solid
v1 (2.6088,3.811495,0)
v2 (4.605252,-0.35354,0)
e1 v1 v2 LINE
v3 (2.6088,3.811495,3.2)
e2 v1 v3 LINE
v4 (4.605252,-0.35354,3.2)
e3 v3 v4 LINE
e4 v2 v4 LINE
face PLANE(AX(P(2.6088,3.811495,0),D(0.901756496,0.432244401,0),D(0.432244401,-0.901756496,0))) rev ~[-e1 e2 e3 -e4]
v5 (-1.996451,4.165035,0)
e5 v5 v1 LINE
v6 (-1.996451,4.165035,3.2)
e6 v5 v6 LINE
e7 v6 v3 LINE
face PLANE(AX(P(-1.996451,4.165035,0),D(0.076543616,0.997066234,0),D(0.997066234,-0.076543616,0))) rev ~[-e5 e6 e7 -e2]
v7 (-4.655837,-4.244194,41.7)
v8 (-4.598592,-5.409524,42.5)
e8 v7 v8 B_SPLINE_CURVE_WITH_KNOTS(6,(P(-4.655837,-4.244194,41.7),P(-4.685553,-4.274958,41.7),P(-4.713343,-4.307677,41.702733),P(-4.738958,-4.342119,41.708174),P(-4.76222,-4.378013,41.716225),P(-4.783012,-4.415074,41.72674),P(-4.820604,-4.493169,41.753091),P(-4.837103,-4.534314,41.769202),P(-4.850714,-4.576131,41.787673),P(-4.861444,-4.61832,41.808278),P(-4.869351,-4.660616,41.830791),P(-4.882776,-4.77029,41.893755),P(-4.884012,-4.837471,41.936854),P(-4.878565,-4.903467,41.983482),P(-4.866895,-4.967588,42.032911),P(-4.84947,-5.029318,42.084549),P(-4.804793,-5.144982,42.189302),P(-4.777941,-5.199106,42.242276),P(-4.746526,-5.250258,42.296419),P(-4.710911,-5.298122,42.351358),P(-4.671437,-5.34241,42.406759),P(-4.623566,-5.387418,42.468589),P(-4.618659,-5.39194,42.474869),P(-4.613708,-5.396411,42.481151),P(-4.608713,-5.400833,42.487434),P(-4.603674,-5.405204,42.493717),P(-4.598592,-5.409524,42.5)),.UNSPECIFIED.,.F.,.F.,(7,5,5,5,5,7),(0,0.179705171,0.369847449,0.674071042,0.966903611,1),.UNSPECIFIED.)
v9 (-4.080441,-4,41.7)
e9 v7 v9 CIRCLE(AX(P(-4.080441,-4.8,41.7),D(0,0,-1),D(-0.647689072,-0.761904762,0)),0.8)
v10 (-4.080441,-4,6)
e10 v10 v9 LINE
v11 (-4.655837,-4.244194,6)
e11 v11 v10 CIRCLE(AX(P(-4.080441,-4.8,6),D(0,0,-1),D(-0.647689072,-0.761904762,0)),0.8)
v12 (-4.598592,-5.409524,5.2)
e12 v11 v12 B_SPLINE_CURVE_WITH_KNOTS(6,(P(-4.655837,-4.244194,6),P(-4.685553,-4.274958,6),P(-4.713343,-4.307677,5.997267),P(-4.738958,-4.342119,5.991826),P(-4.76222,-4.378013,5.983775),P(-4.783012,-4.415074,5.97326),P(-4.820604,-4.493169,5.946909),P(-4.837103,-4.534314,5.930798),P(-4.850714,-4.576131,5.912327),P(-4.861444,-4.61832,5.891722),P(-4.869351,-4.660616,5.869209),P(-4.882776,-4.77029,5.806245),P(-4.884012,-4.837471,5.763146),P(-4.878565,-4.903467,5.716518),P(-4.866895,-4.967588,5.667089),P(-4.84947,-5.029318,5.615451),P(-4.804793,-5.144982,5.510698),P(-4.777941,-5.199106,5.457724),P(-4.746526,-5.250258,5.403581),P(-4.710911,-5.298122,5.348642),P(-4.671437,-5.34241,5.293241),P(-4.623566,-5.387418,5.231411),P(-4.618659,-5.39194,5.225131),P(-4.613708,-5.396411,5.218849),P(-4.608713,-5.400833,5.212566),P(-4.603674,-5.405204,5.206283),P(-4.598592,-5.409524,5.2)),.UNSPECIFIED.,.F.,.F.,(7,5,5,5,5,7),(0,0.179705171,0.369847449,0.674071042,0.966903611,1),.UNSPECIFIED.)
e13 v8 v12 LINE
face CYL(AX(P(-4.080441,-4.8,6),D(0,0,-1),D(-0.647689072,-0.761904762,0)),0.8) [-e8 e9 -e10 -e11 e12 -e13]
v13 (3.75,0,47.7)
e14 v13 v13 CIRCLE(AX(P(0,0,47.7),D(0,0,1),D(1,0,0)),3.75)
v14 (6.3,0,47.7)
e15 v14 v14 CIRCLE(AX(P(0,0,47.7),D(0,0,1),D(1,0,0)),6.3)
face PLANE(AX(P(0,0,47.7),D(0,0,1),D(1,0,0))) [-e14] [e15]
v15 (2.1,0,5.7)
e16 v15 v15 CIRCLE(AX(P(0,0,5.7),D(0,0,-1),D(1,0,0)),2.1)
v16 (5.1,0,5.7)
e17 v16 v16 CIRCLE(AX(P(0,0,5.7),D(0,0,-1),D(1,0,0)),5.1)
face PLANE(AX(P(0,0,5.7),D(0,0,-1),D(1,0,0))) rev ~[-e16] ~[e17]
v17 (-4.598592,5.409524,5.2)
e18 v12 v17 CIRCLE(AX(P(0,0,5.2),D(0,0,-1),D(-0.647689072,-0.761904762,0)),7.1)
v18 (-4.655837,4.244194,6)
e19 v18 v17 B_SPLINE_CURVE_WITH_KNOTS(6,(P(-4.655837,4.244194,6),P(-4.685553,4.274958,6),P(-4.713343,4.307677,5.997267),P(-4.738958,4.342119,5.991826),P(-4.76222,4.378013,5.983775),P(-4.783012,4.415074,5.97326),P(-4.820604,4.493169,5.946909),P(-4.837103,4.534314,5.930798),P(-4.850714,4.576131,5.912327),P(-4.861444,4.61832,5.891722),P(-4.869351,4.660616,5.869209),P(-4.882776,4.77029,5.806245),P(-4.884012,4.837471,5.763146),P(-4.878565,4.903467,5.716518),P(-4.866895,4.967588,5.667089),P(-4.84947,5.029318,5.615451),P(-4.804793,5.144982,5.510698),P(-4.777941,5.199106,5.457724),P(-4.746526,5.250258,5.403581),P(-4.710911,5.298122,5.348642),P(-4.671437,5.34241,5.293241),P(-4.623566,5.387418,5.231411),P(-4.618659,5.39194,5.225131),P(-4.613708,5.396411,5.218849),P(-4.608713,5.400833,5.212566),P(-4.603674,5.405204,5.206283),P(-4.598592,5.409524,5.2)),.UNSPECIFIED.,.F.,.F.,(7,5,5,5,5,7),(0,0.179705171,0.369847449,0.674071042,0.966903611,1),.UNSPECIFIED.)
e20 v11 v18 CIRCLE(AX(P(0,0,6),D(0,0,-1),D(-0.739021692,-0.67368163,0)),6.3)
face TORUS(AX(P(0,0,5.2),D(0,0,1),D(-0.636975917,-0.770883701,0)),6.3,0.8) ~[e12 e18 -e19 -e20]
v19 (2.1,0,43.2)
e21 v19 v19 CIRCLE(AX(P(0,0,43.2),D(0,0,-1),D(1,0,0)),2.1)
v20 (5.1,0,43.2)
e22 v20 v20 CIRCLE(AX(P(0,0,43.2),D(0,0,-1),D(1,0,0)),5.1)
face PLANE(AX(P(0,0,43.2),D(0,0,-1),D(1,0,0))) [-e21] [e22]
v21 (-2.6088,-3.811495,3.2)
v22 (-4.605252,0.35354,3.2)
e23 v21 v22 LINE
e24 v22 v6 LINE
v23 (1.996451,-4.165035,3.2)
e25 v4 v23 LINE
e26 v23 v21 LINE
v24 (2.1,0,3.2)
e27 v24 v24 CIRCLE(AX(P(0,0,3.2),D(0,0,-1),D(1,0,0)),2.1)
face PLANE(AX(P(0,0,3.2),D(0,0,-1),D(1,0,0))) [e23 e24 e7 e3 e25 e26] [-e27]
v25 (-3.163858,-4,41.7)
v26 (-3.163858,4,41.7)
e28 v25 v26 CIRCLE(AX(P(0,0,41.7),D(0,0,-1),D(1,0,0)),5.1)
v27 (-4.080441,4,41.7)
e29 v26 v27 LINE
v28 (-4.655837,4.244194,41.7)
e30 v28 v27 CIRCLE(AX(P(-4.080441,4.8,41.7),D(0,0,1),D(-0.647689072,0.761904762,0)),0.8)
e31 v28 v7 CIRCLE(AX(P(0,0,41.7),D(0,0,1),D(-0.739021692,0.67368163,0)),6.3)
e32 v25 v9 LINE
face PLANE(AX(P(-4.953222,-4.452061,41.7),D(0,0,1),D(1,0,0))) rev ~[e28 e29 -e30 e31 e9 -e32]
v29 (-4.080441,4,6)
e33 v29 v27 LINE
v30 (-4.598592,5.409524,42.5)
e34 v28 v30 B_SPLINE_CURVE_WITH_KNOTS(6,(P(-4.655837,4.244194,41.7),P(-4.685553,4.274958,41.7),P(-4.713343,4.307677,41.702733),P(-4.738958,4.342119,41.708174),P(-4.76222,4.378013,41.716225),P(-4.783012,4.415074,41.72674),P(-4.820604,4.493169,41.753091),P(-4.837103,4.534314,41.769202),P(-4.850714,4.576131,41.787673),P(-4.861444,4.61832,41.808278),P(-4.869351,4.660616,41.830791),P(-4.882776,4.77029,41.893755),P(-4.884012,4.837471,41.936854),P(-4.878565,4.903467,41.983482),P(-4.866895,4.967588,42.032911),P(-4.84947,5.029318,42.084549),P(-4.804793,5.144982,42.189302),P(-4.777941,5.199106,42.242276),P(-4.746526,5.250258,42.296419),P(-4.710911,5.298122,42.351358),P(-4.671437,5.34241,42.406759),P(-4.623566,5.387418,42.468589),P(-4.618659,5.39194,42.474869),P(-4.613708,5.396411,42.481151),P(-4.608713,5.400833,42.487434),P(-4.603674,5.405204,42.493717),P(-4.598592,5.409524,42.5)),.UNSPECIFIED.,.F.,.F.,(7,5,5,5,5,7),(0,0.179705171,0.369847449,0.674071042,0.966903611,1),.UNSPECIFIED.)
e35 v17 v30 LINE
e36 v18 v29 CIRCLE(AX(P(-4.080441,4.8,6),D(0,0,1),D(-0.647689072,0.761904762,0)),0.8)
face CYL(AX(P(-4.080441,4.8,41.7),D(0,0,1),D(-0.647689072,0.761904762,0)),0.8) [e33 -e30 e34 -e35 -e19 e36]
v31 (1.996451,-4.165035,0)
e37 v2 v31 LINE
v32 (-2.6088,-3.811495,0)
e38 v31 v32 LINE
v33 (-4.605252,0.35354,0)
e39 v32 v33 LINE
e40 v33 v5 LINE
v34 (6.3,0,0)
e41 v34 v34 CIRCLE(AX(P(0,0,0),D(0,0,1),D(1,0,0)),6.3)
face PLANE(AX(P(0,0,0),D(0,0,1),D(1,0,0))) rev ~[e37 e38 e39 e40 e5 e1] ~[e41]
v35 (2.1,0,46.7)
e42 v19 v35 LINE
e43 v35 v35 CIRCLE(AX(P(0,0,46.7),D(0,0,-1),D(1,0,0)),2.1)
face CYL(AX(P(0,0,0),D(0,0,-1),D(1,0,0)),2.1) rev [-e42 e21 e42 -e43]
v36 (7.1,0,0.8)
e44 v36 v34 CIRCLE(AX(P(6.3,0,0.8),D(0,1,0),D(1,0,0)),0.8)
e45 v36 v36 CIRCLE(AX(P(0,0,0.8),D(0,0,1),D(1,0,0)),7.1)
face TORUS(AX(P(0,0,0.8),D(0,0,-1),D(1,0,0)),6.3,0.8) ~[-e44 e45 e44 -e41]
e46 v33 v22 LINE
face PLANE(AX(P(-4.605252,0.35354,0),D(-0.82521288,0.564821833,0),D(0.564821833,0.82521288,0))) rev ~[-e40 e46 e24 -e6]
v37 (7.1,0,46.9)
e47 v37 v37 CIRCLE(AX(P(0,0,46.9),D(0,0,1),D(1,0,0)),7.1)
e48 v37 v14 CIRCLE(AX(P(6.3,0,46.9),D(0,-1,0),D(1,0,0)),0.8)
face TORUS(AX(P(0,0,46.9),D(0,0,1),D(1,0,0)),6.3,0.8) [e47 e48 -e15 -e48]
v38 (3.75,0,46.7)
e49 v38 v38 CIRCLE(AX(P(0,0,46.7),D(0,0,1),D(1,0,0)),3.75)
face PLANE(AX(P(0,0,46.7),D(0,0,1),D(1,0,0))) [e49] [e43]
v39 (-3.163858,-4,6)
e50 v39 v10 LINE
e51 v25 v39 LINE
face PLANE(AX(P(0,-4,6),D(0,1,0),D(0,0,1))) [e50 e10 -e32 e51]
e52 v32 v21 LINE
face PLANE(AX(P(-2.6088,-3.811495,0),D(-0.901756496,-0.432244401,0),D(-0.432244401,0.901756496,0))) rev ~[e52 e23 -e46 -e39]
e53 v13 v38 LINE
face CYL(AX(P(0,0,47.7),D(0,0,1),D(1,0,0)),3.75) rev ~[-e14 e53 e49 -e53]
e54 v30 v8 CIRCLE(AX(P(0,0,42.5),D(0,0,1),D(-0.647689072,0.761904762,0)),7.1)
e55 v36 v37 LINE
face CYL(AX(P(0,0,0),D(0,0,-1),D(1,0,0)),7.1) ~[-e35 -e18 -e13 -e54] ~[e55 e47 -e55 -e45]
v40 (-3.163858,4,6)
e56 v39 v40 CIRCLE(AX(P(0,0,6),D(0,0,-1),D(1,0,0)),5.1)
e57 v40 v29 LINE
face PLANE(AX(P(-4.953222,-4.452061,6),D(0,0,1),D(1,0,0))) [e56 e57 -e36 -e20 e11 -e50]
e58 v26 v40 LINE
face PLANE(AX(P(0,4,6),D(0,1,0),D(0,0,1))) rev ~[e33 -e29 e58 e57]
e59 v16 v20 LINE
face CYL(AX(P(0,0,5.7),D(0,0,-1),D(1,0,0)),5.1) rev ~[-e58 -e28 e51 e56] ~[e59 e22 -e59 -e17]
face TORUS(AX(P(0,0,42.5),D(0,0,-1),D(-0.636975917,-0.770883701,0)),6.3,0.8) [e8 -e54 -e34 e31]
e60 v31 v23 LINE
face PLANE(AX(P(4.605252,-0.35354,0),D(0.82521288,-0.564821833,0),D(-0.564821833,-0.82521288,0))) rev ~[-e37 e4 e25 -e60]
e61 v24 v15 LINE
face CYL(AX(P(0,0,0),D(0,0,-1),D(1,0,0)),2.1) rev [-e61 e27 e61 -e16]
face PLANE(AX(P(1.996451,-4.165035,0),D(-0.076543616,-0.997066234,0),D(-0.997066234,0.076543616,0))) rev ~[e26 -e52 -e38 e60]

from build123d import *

# Parameters (mm, degrees)
F0_R          = 7.1
F0_R_2        = 2.1
F1_DEPTH      = 47.7
F3_DEPTH      = 3.2
F4_R          = 3.75
F5_DEPTH      = 1
F6_W          = 8
F6_H          = 35.7
F7_DEPTH      = 25
F9_START      = -2.5
F8_R          = 5.1
F9_DEPTH      = 37.5
F10_T1_DEPTH  = 35.7
F10_T8_ANGLE  = 100.8666218277
F10_T14_ANGLE = 100.8666218277
F10_T23_DEPTH = 40.4388611997
F10_T27_ANGLE = 100.8666218277
F10_T34_ANGLE = 100.8666218277
F10_T38_DEPTH = 40.4388611997
F10_T45_DEPTH = 40.4388611997
F10_T49_ANGLE = 100.8666218277
F10_T56_DEPTH = 40.4388611997
F10_T60_ANGLE = 100.8666218277


# Not quite as in the source:
# - a fillet or chamfer that OpenCascade refuses, or shapes differently, is made with other operations: its cross-section is extruded or revolved along the edge and cut away or added


with BuildPart() as f1:
    # F0 (on Top) → F1 (new body)
    with BuildSketch(Plane.XY):
        Circle(F0_R)
        Circle(F0_R_2, mode=Mode.SUBTRACT)
    extrude(amount=F1_DEPTH)

    # F2 (on face) → F3 (cut)
    with BuildSketch(Plane(origin=(0, 0, 0), x_dir=(1, 0, 0), z_dir=(0, 0, -1))):
        Polygon((2.6088002978, -3.8114950268), (4.6052516685, 0.3535398179), (1.9964513707, 4.1650348447), (-2.6088002978, 3.8114950268), (-4.6052516685, -0.3535398179), (-1.9964513707, -4.1650348447), align=None)
    extrude(amount=-F3_DEPTH, mode=Mode.SUBTRACT)

    # F4 (on face) → F5 (cut)
    with BuildSketch(Plane.XY.offset(47.7)):
        Circle(F4_R)
    extrude(amount=-F5_DEPTH, mode=Mode.SUBTRACT)

    # F6 (on Right) → F7 (cut)
    with BuildSketch(Plane.YZ):
        with Locations((0, 23.85)):
            Rectangle(F6_W, F6_H)
    extrude(amount=-F7_DEPTH, mode=Mode.SUBTRACT)

    # F8 (on face) → F9 (cut)
    with BuildSketch(Plane(origin=(0, 0, 3.2), x_dir=(1, 0, 0), z_dir=(0, 0, -1)).offset(F9_START)):
        Circle(F8_R)
    extrude(amount=-F9_DEPTH, mode=Mode.SUBTRACT)

    # F10: fillet of radius 0.8 on 6 edges, made by hand

    # F10_s2 → F10_t1 (cut)
    with BuildSketch(Plane.XY.offset(6)):
        with BuildLine():
            ThreePointArc((-4.5985924101, 5.4095238095), (-4.831313661, 4.5239737763), (-4.0804411526, 4))
            Line((-4.0804411526, 4), (-5.8660037504, 4))
            ThreePointArc((-5.8660037504, 4), (-5.279548517, 4.747248409), (-4.5985924101, 5.4095238095))
        make_face()
        with BuildLine():
            ThreePointArc((-4.5985924101, -5.4095238095), (-4.831313661, -4.5239737763), (-4.0804411526, -4))
            Line((-4.0804411526, -4), (-5.8660037504, -4))
            ThreePointArc((-5.8660037504, -4), (-5.279548517, -4.747248409), (-4.5985924101, -5.4095238095))
        make_face()
    extrude(amount=F10_T1_DEPTH, mode=Mode.SUBTRACT)

    # F10_s3 → F10_t4 (revolve, cut)
    with BuildSketch(Plane.XZ):
        with BuildLine():
            ThreePointArc((7.1, 0.8), (6.8656854249, 0.2343145751), (6.3, 0))
            Line((6.3, 0), (7.1, 0))
            Line((7.1, 0), (7.1, 0.8))
        make_face()
    revolve(axis=Axis((0, 0, 0), (0, 0, 1)), mode=Mode.SUBTRACT)


with BuildPart() as f10_tool6:
    # F10_s7 → F10_t8 (revolve)
    with BuildSketch(Plane(origin=(0, 0, 0), x_dir=(0, 0, 1), z_dir=(0.7708837014, -0.6369759171, 0))):
        with BuildLine():
            ThreePointArc((5.2, 7.1), (5.7656854249, 6.8656854249), (6, 6.3))
            Line((6, 6.3), (6, 7.1))
            Line((6, 7.1), (5.2, 7.1))
        make_face()
    revolve(axis=Axis((0, 0, 6), (0, 0, -1)), revolution_arc=F10_T8_ANGLE)

    split(bisect_by=Plane.XZ.offset(4), keep=Keep.BOTTOM)

    split(bisect_by=Plane.XZ.offset(-4), keep=Keep.TOP)


with BuildPart() as f1_1:
    add(f1.part)

    # F10_t5: cut F10_tool6
    add(f10_tool6.part, mode=Mode.SUBTRACT)


with BuildPart() as f10_tool12:
    # F10_s13 → F10_t14 (revolve)
    with BuildSketch(Plane(origin=(0, 0, 0), x_dir=(0, 0, 1), z_dir=(0.7708837014, -0.6369759171, 0))):
        with BuildLine():
            ThreePointArc((42.5, 7.1), (41.9343145751, 6.8656854249), (41.7, 6.3))
            Line((41.7, 6.3), (41.7, 7.1))
            Line((41.7, 7.1), (42.5, 7.1))
        make_face()
    revolve(axis=Axis((0, 0, 41.7), (0, 0, -1)), revolution_arc=F10_T14_ANGLE)

    split(bisect_by=Plane.XZ.offset(4), keep=Keep.BOTTOM)

    split(bisect_by=Plane.XZ.offset(-4), keep=Keep.TOP)


with BuildPart() as f1_2:
    add(f1_1.part)

    # F10_t11: cut F10_tool12
    add(f10_tool12.part, mode=Mode.SUBTRACT)

    # F10_s17 → F10_t18 (revolve, cut)
    with BuildSketch(Plane.XZ):
        with BuildLine():
            ThreePointArc((7.1, 46.9), (6.8656854249, 47.4656854249), (6.3, 47.7))
            Line((6.3, 47.7), (7.1, 47.7))
            Line((7.1, 47.7), (7.1, 46.9))
        make_face()
    revolve(axis=Axis((0, 0, 47.7), (0, 0, 1)), mode=Mode.SUBTRACT)


with BuildPart() as f10_tool21:
    # F10_s22 → F10_t23 (new body)
    with BuildSketch(Plane.XY.offset(41.7)):
        with BuildLine():
            ThreePointArc((-4.5985924101, -5.4095238095), (-4.831313661, -4.5239737763), (-4.0804411526, -4))
            Line((-4.0804411526, -4), (-5.8660037504, -4))
            ThreePointArc((-5.8660037504, -4), (-5.279548517, -4.747248409), (-4.5985924101, -5.4095238095))
        make_face()
    extrude(amount=-F10_T23_DEPTH)

    split(bisect_by=Plane.XY.offset(6), keep=Keep.BOTTOM)


with BuildPart() as f10_tool25:
    # F10_s26 → F10_t27 (revolve)
    with BuildSketch(Plane(origin=(0, 0, 0), x_dir=(0, 0, 1), z_dir=(0.7708837014, -0.6369759171, 0))):
        with BuildLine():
            ThreePointArc((5.2, 7.1), (5.7656854249, 6.8656854249), (6, 6.3))
            Line((6, 6.3), (6, 7.1))
            Line((6, 7.1), (5.2, 7.1))
        make_face()
    revolve(axis=Axis((0, 0, 6), (0, 0, -1)), revolution_arc=F10_T27_ANGLE)

    split(bisect_by=Plane.XZ.offset(4), keep=Keep.TOP)


with BuildPart() as f10_tool21_1:
    add(f10_tool21.part)

    # F10_t29: intersect F10_tool25
    add(f10_tool25.part, mode=Mode.INTERSECT)


with BuildPart() as f1_3:
    add(f1_2.part)

    # F10_t19: cut F10_tool21
    add(f10_tool21_1.part, mode=Mode.SUBTRACT)


with BuildPart() as f10_tool32:
    # F10_s33 → F10_t34 (revolve)
    with BuildSketch(Plane(origin=(0, 0, 0), x_dir=(0, 0, 1), z_dir=(0.7708837014, -0.6369759171, 0))):
        with BuildLine():
            ThreePointArc((5.2, 7.1), (5.7656854249, 6.8656854249), (6, 6.3))
            Line((6, 6.3), (6, 7.1))
            Line((6, 7.1), (5.2, 7.1))
        make_face()
    revolve(axis=Axis((0, 0, 6), (0, 0, -1)), revolution_arc=F10_T34_ANGLE)

    split(bisect_by=Plane.XZ.offset(-4), keep=Keep.BOTTOM)


with BuildPart() as f10_tool36:
    # F10_s37 → F10_t38 (new body)
    with BuildSketch(Plane.XY.offset(41.7)):
        with BuildLine():
            ThreePointArc((-4.5985924101, 5.4095238095), (-4.831313661, 4.5239737763), (-4.0804411526, 4))
            Line((-4.0804411526, 4), (-5.8660037504, 4))
            ThreePointArc((-5.8660037504, 4), (-5.279548517, 4.747248409), (-4.5985924101, 5.4095238095))
        make_face()
    extrude(amount=-F10_T38_DEPTH)

    split(bisect_by=Plane.XY.offset(6), keep=Keep.BOTTOM)


with BuildPart() as f10_tool32_1:
    add(f10_tool32.part)

    # F10_t40: intersect F10_tool36
    add(f10_tool36.part, mode=Mode.INTERSECT)


with BuildPart() as f1_4:
    add(f1_3.part)

    # F10_t30: cut F10_tool32
    add(f10_tool32_1.part, mode=Mode.SUBTRACT)


with BuildPart() as f10_tool43:
    # F10_s44 → F10_t45 (new body)
    with BuildSketch(Plane.XY.offset(46.4388611997)):
        with BuildLine():
            ThreePointArc((-4.5985924101, -5.4095238095), (-4.831313661, -4.5239737763), (-4.0804411526, -4))
            Line((-4.0804411526, -4), (-5.8660037504, -4))
            ThreePointArc((-5.8660037504, -4), (-5.279548517, -4.747248409), (-4.5985924101, -5.4095238095))
        make_face()
    extrude(amount=-F10_T45_DEPTH)

    split(bisect_by=Plane.XY.offset(41.7), keep=Keep.TOP)


with BuildPart() as f10_tool47:
    # F10_s48 → F10_t49 (revolve)
    with BuildSketch(Plane(origin=(0, 0, 0), x_dir=(0, 0, 1), z_dir=(0.7708837014, -0.6369759171, 0))):
        with BuildLine():
            ThreePointArc((42.5, 7.1), (41.9343145751, 6.8656854249), (41.7, 6.3))
            Line((41.7, 6.3), (41.7, 7.1))
            Line((41.7, 7.1), (42.5, 7.1))
        make_face()
    revolve(axis=Axis((0, 0, 41.7), (0, 0, -1)), revolution_arc=F10_T49_ANGLE)

    split(bisect_by=Plane.XZ.offset(4), keep=Keep.TOP)


with BuildPart() as f10_tool43_1:
    add(f10_tool43.part)

    # F10_t51: intersect F10_tool47
    add(f10_tool47.part, mode=Mode.INTERSECT)


with BuildPart() as f1_5:
    add(f1_4.part)

    # F10_t41: cut F10_tool43
    add(f10_tool43_1.part, mode=Mode.SUBTRACT)


with BuildPart() as f10_tool54:
    # F10_s55 → F10_t56 (new body)
    with BuildSketch(Plane.XY.offset(46.4388611997)):
        with BuildLine():
            ThreePointArc((-4.5985924101, 5.4095238095), (-4.831313661, 4.5239737763), (-4.0804411526, 4))
            Line((-4.0804411526, 4), (-5.8660037504, 4))
            ThreePointArc((-5.8660037504, 4), (-5.279548517, 4.747248409), (-4.5985924101, 5.4095238095))
        make_face()
    extrude(amount=-F10_T56_DEPTH)

    split(bisect_by=Plane.XY.offset(41.7), keep=Keep.TOP)


with BuildPart() as f10_tool58:
    # F10_s59 → F10_t60 (revolve)
    with BuildSketch(Plane(origin=(0, 0, 0), x_dir=(0, 0, 1), z_dir=(0.7708837014, -0.6369759171, 0))):
        with BuildLine():
            ThreePointArc((42.5, 7.1), (41.9343145751, 6.8656854249), (41.7, 6.3))
            Line((41.7, 6.3), (41.7, 7.1))
            Line((41.7, 7.1), (42.5, 7.1))
        make_face()
    revolve(axis=Axis((0, 0, 41.7), (0, 0, -1)), revolution_arc=F10_T60_ANGLE)

    split(bisect_by=Plane.XZ.offset(-4), keep=Keep.BOTTOM)


with BuildPart() as f10_tool54_1:
    add(f10_tool54.part)

    # F10_t62: intersect F10_tool58
    add(f10_tool58.part, mode=Mode.INTERSECT)


with BuildPart() as f1_6:
    add(f1_5.part)

    # F10_t52: cut F10_tool54
    add(f10_tool54_1.part, mode=Mode.SUBTRACT)


solid = f1_6.part
